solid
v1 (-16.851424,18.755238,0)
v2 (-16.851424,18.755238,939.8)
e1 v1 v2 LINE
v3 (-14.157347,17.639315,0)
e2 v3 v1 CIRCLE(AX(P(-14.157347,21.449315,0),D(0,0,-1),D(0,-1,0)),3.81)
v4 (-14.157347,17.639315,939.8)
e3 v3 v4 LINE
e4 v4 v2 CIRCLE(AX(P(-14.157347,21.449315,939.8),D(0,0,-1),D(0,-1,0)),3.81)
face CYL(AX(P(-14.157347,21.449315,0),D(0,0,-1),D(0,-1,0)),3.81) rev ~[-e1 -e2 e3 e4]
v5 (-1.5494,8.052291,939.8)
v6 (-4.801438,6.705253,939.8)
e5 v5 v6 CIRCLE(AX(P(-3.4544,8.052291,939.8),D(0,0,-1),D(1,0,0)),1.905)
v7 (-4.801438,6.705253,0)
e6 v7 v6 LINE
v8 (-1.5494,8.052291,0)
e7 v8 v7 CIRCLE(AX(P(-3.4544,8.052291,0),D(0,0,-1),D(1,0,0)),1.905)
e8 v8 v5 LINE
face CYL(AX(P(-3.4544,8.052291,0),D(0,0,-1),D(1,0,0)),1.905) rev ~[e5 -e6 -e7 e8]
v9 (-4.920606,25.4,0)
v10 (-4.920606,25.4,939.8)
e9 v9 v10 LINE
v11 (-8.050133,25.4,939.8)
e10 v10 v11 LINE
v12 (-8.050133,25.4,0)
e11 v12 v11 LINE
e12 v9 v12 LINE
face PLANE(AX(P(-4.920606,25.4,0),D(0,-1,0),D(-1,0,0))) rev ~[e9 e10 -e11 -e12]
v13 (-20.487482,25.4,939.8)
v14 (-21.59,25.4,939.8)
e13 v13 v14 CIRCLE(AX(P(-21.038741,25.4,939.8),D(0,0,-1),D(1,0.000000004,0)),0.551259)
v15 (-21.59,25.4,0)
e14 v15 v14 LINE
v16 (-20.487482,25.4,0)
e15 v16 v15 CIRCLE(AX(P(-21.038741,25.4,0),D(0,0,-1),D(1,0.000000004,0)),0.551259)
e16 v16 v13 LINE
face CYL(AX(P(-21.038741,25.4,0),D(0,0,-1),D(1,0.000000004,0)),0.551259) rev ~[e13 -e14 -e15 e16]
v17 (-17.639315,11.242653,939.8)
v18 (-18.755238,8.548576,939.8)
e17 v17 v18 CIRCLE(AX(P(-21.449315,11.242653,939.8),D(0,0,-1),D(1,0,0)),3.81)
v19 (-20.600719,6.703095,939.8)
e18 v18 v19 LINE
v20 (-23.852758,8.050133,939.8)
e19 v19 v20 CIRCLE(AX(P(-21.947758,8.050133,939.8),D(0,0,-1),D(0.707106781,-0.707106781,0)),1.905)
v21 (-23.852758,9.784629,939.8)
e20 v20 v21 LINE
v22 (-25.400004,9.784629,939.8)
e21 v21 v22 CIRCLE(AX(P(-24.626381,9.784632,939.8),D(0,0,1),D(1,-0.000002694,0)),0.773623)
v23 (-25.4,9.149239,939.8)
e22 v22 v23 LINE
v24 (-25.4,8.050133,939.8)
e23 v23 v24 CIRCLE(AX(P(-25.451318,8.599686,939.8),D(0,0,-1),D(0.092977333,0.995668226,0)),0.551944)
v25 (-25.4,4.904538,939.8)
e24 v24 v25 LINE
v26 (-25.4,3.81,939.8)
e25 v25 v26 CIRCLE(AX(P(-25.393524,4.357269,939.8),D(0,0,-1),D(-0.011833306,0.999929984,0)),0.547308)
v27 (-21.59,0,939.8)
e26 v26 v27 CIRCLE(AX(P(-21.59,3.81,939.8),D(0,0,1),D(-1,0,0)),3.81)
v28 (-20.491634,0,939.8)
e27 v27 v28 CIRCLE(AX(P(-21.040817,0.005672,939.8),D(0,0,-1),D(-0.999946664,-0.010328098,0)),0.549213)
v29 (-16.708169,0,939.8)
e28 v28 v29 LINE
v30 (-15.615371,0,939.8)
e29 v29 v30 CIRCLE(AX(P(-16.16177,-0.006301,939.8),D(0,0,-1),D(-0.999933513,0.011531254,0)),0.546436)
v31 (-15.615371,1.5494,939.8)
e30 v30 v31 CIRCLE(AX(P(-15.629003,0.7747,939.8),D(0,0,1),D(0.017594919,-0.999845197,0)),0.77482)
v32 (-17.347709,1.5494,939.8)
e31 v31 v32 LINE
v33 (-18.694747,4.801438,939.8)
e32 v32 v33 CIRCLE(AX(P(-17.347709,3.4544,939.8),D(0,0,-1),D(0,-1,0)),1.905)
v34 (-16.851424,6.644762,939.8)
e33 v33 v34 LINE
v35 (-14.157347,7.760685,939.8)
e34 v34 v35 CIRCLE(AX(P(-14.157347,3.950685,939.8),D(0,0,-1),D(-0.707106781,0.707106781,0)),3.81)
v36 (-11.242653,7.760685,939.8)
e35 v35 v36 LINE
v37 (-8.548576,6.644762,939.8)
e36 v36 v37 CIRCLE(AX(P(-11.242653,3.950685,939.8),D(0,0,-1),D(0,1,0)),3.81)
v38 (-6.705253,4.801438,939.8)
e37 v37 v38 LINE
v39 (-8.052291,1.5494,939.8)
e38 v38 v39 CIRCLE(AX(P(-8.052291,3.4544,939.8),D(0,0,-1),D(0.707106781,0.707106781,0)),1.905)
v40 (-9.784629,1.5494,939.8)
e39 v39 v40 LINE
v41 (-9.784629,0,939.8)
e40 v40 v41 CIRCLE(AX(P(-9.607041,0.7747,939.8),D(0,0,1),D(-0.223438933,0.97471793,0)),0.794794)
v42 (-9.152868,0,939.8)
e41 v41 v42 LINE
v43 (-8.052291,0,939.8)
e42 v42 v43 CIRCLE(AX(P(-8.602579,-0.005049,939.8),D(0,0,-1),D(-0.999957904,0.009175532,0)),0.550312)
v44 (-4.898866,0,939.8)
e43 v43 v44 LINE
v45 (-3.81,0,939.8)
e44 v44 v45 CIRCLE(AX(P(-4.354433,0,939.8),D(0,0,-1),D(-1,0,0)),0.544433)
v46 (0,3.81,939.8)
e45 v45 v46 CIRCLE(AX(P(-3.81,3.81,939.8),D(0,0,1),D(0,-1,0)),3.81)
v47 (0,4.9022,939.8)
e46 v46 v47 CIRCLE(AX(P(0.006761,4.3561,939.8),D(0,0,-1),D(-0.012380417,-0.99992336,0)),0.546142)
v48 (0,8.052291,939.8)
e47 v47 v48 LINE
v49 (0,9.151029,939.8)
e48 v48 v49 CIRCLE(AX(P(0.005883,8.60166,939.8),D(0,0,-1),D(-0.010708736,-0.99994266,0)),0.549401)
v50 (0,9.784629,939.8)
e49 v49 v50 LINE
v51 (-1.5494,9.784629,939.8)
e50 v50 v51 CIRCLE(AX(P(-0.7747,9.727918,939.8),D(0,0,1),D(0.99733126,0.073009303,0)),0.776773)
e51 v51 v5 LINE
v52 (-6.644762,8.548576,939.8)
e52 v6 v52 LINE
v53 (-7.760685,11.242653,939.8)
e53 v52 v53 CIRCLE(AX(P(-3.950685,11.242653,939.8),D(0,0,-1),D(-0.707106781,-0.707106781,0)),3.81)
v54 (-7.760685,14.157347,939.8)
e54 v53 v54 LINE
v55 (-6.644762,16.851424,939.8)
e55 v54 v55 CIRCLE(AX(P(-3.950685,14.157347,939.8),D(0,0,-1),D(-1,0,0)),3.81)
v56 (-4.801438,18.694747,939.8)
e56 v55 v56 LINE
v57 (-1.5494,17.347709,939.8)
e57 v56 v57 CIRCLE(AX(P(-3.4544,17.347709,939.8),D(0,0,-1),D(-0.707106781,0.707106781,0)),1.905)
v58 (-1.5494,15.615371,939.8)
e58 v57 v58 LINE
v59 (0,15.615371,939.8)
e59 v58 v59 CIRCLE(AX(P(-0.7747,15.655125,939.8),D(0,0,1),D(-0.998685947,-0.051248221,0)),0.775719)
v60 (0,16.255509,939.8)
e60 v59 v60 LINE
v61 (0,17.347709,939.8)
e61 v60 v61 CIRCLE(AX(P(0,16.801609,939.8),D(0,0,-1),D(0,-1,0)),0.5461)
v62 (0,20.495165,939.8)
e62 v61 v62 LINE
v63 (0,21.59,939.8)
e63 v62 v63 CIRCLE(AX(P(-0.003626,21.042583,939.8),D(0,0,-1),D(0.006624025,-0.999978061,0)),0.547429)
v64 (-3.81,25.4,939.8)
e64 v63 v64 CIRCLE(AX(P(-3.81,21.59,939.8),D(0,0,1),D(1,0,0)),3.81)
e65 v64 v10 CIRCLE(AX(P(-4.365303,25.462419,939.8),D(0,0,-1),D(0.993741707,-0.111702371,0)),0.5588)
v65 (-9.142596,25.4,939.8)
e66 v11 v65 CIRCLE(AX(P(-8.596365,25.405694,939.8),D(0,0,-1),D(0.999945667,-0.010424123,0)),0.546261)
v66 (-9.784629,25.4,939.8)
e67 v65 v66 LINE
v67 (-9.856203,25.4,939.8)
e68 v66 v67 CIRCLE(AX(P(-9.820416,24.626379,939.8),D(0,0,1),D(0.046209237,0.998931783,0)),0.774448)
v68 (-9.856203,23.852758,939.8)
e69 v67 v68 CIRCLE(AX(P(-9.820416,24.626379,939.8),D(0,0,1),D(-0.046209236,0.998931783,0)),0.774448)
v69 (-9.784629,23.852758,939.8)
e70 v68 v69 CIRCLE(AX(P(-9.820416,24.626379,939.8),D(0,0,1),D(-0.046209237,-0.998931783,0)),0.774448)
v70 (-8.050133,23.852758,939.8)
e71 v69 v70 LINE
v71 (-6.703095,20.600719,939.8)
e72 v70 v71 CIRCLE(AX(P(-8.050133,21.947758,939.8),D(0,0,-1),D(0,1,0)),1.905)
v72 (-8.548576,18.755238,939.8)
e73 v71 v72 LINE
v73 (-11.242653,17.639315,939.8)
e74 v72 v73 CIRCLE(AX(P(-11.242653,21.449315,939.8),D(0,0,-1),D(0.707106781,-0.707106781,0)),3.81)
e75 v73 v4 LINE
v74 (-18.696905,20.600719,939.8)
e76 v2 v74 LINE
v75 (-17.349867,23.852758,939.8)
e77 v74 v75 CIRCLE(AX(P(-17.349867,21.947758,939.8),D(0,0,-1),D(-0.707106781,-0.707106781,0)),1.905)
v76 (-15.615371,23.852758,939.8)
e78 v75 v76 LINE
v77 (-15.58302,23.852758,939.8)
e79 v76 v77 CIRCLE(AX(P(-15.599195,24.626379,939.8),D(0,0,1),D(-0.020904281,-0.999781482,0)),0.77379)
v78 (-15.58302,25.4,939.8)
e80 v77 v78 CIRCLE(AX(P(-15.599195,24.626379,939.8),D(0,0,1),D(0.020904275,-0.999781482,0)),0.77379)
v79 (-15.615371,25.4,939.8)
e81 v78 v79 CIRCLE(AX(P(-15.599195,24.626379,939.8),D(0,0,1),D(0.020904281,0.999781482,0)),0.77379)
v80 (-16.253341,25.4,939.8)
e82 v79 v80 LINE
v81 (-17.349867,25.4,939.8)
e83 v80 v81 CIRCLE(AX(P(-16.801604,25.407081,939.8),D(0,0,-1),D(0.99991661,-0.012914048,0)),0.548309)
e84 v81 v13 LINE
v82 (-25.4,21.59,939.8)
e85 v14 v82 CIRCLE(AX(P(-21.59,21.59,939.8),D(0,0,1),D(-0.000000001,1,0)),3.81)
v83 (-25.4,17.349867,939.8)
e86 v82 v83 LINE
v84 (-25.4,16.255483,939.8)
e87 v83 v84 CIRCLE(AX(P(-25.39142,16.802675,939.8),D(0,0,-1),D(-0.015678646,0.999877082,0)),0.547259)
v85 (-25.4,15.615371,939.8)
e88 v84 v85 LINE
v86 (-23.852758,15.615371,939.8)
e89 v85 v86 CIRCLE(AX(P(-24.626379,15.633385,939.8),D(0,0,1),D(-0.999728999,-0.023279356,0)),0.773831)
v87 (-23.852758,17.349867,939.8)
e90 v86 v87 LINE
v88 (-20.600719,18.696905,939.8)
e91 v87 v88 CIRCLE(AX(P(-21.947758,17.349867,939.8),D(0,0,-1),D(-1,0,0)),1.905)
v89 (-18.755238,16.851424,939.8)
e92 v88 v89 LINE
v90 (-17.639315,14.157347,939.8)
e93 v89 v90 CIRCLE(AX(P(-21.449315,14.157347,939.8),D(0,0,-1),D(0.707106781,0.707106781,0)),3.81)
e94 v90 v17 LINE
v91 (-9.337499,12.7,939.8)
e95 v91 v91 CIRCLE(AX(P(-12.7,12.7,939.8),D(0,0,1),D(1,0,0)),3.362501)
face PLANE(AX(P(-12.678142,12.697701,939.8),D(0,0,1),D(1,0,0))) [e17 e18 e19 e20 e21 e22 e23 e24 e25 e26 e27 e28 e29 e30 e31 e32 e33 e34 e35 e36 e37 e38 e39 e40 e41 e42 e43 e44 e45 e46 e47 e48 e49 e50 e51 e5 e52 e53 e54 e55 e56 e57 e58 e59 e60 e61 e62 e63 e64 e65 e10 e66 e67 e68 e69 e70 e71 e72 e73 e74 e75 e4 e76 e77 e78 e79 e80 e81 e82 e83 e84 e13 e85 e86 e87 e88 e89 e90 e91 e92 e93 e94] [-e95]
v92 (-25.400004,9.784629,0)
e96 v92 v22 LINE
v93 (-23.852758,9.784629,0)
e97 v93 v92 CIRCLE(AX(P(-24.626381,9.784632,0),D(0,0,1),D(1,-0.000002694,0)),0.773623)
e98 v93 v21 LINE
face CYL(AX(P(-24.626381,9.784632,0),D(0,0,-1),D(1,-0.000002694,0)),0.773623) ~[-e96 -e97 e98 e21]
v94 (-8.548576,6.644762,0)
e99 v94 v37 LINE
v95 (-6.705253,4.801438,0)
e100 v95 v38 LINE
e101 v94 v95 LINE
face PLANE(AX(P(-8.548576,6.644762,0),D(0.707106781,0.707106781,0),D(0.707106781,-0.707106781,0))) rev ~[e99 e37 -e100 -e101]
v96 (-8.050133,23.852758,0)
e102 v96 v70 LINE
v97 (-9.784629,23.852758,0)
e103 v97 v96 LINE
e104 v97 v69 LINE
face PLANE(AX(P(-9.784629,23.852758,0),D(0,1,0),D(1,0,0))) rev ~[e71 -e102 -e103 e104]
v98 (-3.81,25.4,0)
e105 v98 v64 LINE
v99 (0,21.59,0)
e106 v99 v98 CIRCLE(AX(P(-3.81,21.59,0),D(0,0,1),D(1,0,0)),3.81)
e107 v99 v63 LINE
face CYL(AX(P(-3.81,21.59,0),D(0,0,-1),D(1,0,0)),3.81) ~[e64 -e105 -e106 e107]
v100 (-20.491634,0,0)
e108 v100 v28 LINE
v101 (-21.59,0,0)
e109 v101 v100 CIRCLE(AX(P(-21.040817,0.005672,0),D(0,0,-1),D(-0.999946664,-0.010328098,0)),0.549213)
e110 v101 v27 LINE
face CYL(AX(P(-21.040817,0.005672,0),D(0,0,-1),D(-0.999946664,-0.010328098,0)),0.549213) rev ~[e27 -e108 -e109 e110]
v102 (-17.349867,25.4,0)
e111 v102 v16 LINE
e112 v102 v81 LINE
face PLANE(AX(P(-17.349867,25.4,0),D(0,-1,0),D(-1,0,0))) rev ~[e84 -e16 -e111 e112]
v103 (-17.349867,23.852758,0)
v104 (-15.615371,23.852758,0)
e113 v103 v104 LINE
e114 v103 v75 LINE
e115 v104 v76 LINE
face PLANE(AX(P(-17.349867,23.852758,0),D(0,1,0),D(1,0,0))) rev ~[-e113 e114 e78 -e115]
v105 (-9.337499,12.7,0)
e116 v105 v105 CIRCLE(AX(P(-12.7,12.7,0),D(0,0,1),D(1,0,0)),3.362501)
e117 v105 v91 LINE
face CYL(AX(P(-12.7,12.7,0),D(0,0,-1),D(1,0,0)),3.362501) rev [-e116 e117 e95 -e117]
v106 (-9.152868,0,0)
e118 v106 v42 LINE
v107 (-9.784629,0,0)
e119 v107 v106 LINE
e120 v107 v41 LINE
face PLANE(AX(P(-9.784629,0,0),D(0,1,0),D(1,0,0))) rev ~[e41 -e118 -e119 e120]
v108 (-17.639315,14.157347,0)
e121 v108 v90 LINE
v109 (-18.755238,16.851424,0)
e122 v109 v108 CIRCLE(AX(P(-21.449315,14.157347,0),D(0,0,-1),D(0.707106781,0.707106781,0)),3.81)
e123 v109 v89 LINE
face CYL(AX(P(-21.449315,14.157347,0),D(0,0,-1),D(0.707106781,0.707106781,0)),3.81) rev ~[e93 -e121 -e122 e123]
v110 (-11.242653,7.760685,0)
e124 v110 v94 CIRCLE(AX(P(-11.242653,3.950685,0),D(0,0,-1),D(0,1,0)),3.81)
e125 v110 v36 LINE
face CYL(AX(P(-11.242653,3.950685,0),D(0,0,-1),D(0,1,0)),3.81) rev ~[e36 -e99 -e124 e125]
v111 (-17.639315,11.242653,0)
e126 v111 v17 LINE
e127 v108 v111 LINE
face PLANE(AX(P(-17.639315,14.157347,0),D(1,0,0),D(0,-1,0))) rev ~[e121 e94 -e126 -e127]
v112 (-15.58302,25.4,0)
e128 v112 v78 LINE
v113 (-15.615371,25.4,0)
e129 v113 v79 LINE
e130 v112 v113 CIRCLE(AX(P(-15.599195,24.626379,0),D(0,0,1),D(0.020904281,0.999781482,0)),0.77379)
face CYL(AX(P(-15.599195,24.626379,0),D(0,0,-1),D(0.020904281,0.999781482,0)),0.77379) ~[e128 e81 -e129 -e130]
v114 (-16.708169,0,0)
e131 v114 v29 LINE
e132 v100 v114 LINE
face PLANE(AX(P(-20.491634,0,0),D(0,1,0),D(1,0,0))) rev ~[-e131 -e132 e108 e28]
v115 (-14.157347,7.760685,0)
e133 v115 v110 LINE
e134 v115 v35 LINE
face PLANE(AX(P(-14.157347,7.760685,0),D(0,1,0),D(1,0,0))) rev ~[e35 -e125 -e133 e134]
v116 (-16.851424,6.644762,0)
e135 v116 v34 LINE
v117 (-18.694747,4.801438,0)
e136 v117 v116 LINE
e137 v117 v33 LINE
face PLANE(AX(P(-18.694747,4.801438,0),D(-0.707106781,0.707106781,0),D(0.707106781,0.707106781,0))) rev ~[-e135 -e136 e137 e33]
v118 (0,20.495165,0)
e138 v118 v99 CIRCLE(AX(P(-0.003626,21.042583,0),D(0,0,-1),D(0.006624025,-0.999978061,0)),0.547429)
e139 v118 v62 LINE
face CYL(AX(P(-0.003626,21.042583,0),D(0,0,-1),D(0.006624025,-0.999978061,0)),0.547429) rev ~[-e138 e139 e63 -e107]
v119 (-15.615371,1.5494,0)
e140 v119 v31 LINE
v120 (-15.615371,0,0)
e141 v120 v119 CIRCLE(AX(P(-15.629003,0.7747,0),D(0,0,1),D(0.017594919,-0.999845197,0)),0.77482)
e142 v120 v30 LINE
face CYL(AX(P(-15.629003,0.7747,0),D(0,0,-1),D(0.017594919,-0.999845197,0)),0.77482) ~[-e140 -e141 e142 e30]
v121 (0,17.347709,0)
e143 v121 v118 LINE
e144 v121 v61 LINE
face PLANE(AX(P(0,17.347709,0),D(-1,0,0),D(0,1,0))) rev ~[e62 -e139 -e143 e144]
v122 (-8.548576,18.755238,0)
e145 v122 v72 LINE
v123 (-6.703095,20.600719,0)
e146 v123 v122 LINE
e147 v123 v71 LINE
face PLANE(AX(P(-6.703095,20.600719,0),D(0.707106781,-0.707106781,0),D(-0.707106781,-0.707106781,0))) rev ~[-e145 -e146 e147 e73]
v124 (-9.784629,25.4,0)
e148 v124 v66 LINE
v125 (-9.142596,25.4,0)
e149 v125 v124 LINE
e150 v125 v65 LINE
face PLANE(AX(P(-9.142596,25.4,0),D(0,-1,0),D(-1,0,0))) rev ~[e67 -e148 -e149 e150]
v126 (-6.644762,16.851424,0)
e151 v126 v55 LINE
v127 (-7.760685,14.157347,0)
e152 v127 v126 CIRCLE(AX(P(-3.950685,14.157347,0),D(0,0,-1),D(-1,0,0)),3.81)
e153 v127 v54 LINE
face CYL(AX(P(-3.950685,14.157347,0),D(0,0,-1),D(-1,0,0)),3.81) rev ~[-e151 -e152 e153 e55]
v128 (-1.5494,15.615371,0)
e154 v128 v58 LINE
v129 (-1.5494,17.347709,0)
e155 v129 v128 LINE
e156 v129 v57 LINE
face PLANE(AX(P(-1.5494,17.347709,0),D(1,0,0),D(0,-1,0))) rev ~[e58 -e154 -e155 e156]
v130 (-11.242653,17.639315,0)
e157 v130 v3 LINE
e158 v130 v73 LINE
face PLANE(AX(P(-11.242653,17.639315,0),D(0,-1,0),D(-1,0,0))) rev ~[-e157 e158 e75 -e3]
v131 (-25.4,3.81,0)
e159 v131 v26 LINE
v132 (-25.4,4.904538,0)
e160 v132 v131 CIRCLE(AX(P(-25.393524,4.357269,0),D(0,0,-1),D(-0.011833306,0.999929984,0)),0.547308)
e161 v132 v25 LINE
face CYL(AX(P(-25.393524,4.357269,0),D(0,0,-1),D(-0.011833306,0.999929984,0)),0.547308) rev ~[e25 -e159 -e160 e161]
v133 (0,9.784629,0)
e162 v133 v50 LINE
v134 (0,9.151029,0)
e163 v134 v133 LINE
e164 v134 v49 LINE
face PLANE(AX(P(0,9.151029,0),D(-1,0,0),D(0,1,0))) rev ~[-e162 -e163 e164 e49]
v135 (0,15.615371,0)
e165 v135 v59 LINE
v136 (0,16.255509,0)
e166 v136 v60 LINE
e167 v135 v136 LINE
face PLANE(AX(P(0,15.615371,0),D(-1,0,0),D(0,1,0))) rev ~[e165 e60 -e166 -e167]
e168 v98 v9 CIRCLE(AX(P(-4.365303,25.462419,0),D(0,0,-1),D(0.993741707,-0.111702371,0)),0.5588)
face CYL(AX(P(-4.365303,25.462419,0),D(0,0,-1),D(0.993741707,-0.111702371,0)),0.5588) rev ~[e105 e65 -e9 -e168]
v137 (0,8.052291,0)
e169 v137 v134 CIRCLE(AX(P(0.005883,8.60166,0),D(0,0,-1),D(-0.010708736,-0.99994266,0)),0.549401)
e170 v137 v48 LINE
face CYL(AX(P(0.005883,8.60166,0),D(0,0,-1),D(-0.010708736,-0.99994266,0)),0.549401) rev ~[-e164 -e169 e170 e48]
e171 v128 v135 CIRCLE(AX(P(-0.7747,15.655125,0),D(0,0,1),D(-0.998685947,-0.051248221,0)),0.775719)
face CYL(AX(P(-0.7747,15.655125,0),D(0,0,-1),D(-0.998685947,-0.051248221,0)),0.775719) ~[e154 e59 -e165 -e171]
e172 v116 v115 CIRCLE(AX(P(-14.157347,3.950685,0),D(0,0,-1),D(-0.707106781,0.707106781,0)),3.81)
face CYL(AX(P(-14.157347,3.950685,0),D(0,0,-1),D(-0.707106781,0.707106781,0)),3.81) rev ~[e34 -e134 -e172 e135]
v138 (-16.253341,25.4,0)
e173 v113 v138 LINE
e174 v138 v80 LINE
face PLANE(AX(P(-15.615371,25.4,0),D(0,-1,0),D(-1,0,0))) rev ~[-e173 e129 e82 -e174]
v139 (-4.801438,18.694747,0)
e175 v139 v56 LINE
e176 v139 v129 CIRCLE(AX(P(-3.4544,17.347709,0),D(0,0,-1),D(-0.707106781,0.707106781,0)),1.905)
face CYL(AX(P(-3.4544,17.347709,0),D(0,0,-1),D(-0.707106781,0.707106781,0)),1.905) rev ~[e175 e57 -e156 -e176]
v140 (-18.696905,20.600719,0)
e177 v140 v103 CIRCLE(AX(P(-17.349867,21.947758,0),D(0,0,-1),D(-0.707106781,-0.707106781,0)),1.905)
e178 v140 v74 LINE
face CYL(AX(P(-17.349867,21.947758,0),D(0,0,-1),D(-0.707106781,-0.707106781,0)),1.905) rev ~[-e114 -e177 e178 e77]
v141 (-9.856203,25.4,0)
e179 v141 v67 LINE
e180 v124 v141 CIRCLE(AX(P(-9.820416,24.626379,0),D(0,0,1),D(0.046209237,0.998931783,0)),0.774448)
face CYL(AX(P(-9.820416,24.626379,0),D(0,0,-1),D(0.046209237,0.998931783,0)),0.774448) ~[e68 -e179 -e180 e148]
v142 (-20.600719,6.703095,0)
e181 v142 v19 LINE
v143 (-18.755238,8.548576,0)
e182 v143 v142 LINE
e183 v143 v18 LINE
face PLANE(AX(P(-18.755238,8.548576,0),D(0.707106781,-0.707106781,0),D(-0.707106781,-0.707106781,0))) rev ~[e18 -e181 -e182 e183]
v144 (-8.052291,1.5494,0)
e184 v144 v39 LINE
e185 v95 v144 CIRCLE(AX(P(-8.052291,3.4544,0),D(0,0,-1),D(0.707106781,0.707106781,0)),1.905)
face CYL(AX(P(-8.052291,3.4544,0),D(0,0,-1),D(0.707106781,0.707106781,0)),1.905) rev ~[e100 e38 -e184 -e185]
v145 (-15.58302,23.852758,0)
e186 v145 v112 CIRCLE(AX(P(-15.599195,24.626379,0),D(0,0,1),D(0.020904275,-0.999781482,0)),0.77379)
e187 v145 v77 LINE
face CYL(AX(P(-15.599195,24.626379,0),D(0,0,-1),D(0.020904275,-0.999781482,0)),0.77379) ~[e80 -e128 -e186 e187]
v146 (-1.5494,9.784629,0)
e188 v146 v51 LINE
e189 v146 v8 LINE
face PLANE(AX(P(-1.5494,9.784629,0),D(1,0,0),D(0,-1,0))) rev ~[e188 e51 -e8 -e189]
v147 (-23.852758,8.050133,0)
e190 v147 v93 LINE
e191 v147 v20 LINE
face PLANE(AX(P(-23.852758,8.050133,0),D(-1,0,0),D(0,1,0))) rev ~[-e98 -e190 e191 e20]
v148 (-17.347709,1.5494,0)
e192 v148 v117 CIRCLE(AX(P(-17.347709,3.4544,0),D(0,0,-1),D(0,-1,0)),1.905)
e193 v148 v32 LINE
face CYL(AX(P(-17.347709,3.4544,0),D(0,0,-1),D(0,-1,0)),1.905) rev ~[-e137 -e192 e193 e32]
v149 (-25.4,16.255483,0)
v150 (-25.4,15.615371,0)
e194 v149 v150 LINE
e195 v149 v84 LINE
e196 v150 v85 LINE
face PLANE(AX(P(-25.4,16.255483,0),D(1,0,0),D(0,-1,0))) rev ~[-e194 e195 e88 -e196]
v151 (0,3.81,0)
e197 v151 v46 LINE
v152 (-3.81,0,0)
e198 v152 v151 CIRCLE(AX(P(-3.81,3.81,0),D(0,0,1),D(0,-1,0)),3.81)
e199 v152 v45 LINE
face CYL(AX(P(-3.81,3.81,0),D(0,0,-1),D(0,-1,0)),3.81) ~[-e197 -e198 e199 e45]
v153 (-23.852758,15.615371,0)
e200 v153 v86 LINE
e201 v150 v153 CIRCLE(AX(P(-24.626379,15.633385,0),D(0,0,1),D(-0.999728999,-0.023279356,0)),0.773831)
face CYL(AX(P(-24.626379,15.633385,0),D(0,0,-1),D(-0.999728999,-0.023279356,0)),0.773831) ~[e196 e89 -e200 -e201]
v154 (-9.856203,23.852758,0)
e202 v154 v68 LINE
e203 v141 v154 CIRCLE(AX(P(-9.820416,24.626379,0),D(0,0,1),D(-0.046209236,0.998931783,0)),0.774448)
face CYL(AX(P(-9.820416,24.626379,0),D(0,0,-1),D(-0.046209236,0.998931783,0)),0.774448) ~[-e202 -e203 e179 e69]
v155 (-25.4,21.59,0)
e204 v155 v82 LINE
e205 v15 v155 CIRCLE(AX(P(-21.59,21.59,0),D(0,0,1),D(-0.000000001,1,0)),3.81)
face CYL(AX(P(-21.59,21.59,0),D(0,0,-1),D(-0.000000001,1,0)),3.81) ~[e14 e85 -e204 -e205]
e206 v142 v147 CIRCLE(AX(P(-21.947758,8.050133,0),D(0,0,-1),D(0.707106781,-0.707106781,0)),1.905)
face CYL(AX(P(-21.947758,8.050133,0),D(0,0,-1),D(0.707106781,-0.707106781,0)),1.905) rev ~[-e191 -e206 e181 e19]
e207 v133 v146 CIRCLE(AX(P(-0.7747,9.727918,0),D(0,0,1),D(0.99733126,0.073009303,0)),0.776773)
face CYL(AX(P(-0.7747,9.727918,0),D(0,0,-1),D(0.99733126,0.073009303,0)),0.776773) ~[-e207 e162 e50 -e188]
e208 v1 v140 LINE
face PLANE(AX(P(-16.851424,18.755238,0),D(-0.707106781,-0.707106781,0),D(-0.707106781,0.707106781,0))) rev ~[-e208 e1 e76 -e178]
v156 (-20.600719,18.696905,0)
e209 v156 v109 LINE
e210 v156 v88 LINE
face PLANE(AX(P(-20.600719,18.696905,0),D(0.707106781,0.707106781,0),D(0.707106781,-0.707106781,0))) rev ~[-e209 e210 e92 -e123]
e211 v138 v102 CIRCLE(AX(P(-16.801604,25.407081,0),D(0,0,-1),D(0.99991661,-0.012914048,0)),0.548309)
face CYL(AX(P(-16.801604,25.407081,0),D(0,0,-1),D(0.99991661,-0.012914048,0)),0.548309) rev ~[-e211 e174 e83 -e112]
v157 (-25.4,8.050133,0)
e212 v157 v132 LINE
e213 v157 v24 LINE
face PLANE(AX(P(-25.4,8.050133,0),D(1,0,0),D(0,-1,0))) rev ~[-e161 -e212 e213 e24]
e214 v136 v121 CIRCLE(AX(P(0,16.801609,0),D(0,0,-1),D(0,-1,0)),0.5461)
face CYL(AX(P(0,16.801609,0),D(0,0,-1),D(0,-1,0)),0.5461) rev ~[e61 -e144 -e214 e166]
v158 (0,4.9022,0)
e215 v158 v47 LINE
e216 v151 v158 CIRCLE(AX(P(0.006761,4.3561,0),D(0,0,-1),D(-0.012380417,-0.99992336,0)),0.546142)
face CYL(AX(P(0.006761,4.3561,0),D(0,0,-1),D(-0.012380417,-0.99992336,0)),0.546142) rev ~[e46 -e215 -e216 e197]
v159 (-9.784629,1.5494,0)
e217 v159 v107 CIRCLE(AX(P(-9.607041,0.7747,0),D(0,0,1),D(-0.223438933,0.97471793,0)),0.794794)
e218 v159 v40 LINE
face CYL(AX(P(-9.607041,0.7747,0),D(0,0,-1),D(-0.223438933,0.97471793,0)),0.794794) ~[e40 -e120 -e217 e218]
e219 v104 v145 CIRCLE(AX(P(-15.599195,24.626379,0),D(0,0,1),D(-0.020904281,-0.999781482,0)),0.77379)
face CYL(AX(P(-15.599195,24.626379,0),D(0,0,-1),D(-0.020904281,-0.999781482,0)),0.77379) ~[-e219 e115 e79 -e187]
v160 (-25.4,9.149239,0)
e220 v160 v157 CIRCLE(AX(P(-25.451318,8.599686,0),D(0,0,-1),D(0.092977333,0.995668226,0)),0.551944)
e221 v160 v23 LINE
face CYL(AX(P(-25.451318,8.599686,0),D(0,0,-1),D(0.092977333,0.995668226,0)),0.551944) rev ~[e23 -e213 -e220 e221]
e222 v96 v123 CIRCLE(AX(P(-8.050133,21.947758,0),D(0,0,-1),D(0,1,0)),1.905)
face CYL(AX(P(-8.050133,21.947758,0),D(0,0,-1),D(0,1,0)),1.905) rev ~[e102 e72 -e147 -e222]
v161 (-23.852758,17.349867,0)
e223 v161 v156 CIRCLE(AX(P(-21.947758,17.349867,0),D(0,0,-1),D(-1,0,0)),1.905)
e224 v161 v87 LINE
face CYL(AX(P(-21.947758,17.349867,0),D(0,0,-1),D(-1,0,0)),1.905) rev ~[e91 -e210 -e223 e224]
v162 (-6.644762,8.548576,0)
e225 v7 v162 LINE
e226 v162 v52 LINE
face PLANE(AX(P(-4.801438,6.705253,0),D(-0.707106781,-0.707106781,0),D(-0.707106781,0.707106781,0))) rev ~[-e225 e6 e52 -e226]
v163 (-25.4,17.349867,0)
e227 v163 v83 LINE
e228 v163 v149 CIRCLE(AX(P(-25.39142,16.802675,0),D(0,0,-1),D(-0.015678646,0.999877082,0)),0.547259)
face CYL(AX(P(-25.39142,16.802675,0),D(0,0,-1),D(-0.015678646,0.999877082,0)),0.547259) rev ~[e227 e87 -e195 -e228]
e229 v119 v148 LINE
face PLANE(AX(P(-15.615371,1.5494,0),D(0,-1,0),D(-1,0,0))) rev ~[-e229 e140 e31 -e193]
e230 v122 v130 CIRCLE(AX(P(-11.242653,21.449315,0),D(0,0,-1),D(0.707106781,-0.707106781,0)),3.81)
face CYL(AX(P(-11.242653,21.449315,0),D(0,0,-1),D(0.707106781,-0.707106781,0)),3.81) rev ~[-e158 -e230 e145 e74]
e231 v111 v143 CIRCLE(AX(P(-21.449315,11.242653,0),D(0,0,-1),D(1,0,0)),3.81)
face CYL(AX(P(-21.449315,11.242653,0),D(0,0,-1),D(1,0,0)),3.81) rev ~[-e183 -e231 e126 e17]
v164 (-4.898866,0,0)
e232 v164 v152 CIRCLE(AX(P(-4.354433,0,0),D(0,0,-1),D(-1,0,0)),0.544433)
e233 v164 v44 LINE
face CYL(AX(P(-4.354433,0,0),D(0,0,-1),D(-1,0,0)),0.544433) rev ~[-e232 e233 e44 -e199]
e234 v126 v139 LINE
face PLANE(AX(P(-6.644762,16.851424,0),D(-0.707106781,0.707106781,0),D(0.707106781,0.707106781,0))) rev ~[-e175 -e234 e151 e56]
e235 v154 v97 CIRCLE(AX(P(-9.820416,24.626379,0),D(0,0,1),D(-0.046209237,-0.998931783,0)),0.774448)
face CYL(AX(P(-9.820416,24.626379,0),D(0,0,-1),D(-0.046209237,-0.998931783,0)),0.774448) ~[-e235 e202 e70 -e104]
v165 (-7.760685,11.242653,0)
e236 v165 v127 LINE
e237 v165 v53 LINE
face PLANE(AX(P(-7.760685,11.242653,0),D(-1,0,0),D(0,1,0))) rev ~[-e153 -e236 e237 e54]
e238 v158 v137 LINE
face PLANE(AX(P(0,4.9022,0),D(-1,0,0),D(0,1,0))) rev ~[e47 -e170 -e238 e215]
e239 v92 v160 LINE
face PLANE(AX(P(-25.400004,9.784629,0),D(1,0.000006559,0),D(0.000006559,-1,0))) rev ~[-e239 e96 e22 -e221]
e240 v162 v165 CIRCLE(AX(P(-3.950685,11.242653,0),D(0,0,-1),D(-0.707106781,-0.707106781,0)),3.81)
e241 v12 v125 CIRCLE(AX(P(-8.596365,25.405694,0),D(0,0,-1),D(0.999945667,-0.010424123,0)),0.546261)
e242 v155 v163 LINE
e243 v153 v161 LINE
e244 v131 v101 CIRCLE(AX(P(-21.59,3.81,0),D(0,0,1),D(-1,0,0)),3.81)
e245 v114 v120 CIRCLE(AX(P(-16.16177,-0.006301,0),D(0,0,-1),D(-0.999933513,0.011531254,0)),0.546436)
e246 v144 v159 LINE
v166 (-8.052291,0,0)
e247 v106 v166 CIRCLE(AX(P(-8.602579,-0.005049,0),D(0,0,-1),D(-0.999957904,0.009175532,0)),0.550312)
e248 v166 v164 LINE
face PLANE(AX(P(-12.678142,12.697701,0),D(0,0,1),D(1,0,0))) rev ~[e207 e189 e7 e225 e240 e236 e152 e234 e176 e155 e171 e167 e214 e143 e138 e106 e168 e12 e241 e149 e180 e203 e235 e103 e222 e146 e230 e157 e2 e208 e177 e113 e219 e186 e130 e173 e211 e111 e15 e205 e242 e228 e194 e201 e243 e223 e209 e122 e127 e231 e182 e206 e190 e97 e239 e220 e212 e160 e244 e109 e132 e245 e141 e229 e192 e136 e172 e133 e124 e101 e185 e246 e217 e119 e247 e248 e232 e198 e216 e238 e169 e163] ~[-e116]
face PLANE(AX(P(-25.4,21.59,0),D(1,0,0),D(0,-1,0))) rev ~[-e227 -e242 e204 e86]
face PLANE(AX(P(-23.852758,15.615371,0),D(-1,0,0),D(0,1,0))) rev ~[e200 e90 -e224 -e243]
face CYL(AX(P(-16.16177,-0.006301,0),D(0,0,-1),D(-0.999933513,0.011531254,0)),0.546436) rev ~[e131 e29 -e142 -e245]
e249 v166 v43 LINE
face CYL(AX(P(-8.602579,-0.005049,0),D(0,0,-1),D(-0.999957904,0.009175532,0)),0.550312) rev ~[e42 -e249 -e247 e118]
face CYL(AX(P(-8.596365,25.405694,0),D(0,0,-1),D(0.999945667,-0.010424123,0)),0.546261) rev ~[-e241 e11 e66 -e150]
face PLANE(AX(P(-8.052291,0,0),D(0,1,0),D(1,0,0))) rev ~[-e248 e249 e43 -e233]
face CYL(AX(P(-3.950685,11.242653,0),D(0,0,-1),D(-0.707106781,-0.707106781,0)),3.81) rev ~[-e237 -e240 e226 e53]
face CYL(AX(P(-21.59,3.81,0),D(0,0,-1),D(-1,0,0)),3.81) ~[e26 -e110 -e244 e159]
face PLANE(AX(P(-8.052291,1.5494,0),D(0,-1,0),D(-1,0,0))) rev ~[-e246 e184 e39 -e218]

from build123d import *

# Parameters (mm, degrees)
F0_R     = 3.3625011168
F1_DEPTH = 939.8


# Not quite as in the source:
# - ends of sketch curves that miss each other by under 0.0002 mm in the source are joined


with BuildPart() as f1:
    # F0 (on Top) → F1 (new body)
    with BuildSketch(Plane.XY):
        with BuildLine():
            ThreePointArc((-8.5485764575, 18.7552378401), (-9.7846294165, 17.9293336576), (-11.2426532939, 17.6393146764))
            Line((-11.2426532939, 17.6393146764), (-14.1573467061, 17.6393146764))
            ThreePointArc((-14.1573467061, 17.6393146764), (-15.6153705835, 17.9293336576), (-16.8514235425, 18.7552378401))
            Line((-16.8514235425, 18.7552378401), (-18.696905198, 20.6007194956))
            ThreePointArc((-18.696905198, 20.6007194956), (-19.1098572893, 22.6767698525), (-17.3498667798, 23.8527579138))
            Line((-17.3498667798, 23.8527579138), (-15.6153705835, 23.8527579138))
            Line((-15.6153705835, 23.8527579138), (-15.5830195394, 23.8527579138))
            ThreePointArc((-15.5830195394, 23.8527579138), (-14.8254049311, 24.6263789569), (-15.5830195394, 25.4))
            Line((-15.5830195394, 25.4), (-15.6153705835, 25.4))
            Line((-15.6153705835, 25.4), (-16.2533409894, 25.4))
            ThreePointArc((-16.2533409894, 25.4), (-16.8016038846, 24.8587722652), (-17.3498667798, 25.4))
            Line((-17.3498667798, 25.4), (-20.4874817282, 25.4))
            ThreePointArc((-20.4874817282, 25.4), (-21.0387408641, 24.8487408595), (-21.5900000046, 25.4))
            ThreePointArc((-21.5900000046, 25.4), (-24.2840768363, 24.2840768363), (-25.4, 21.59))
            Line((-25.4, 21.59), (-25.4, 20.5047242343))
            Line((-25.4, 20.5047242343), (-25.4, 17.3498667798))
            ThreePointArc((-25.4, 17.3498667798), (-24.8441605755, 16.8026749055), (-25.4, 16.2554830313))
            Line((-25.4, 16.2554830313), (-25.4, 15.6153705835))
            ThreePointArc((-25.4, 15.6153705835), (-24.6263789569, 14.8595541131), (-23.8527579138, 15.6153705835))
            Line((-23.8527579138, 15.6153705835), (-23.8527579138, 17.3498667798))
            ThreePointArc((-23.8527579138, 17.3498667798), (-22.6767698525, 19.1098572893), (-20.6007194956, 18.696905198))
            Line((-20.6007194956, 18.696905198), (-18.7552378401, 16.8514235425))
            ThreePointArc((-18.7552378401, 16.8514235425), (-17.9293336576, 15.6153705835), (-17.6393146764, 14.1573467061))
            Line((-17.6393146764, 14.1573467061), (-17.6393146764, 11.2426532939))
            ThreePointArc((-17.6393146764, 11.2426532939), (-17.9293336576, 9.7846294165), (-18.7552378401, 8.5485764575))
            Line((-18.7552378401, 8.5485764575), (-20.6007194956, 6.703094802))
            ThreePointArc((-20.6007194956, 6.703094802), (-22.6767698525, 6.2901427107), (-23.8527579138, 8.0501332202))
            Line((-23.8527579138, 8.0501332202), (-23.8527579138, 9.7846294165))
            ThreePointArc((-23.8527579138, 9.7846294165), (-24.6263789569, 10.5582546272), (-25.4000041675, 9.7846294165))
            Line((-25.4000041675, 9.7846294165), (-25.4, 9.1492393985))
            ThreePointArc((-25.4, 9.1492393985), (-24.8993742936, 8.5996863094), (-25.4, 8.0501332202))
            Line((-25.4, 8.0501332202), (-25.4, 4.904538393))
            ThreePointArc((-25.4, 4.904538393), (-24.8462160257, 4.3572691965), (-25.4, 3.81))
            ThreePointArc((-25.4, 3.81), (-24.2840768363, 1.1159231637), (-21.59, 0))
            ThreePointArc((-21.59, 0), (-21.0408167821, 0.5548848314), (-20.4916335642, 0))
            Line((-20.4916335642, 0), (-16.7081691325, 0))
            ThreePointArc((-16.7081691325, 0), (-16.161769858, 0.5401345174), (-15.6153705835, 0))
            ThreePointArc((-15.6153705835, 0), (-14.8541835334, 0.7747), (-15.6153705835, 1.5494))
            Line((-15.6153705835, 1.5494), (-17.347708866, 1.5494))
            ThreePointArc((-17.347708866, 1.5494), (-19.1076993754, 2.7253880613), (-18.6947472842, 4.8014384182))
            Line((-18.6947472842, 4.8014384182), (-16.8514235425, 6.6447621599))
            ThreePointArc((-16.8514235425, 6.6447621599), (-15.6153705835, 7.4706663424), (-14.1573467061, 7.7606853236))
            Line((-14.1573467061, 7.7606853236), (-11.2426532939, 7.7606853236))
            ThreePointArc((-11.2426532939, 7.7606853236), (-9.7846294165, 7.4706663424), (-8.5485764575, 6.6447621599))
            Line((-8.5485764575, 6.6447621599), (-6.7052527158, 4.8014384182))
            ThreePointArc((-6.7052527158, 4.8014384182), (-6.2923006246, 2.7253880613), (-8.052291134, 1.5494))
            Line((-8.052291134, 1.5494), (-9.7846294165, 1.5494))
            ThreePointArc((-9.7846294165, 1.5494), (-10.4018355229, 0.7747), (-9.7846294165, 0))
            Line((-9.7846294165, 0), (-9.1528678313, 0))
            ThreePointArc((-9.1528678313, 0), (-8.6025794826, 0.5452621138), (-8.052291134, 0))
            Line((-8.052291134, 0), (-4.8988661729, 0))
            ThreePointArc((-4.8988661729, 0), (-4.3544330864, 0.5444330864), (-3.81, 0))
            ThreePointArc((-3.81, 0), (-1.1159231637, 1.1159231637), (0, 3.81))
            ThreePointArc((0, 3.81), (-0.5393803924, 4.3561), (0, 4.9022))
            Line((0, 4.9022), (0, 8.052291134))
            ThreePointArc((0, 8.052291134), (-0.5435172497, 8.6016602673), (0, 9.1510294005))
            Line((0, 9.1510294005), (0, 9.7846294165))
            ThreePointArc((0, 9.7846294165), (-0.7747, 10.5046907664), (-1.5494, 9.7846294165))
            Line((-1.5494, 9.7846294165), (-1.5494, 8.052291134))
            ThreePointArc((-1.5494, 8.052291134), (-2.7253880613, 6.2923006246), (-4.8014384182, 6.7052527158))
            Line((-4.8014384182, 6.7052527158), (-6.6447621599, 8.5485764575))
            ThreePointArc((-6.6447621599, 8.5485764575), (-7.4706663424, 9.7846294165), (-7.7606853236, 11.2426532939))
            Line((-7.7606853236, 11.2426532939), (-7.7606853236, 14.1573467061))
            ThreePointArc((-7.7606853236, 14.1573467061), (-7.4706663424, 15.6153705835), (-6.6447621599, 16.8514235425))
            Line((-6.6447621599, 16.8514235425), (-4.8014384182, 18.6947472842))
            ThreePointArc((-4.8014384182, 18.6947472842), (-2.7253880613, 19.1076993754), (-1.5494, 17.347708866))
            Line((-1.5494, 17.347708866), (-1.5494, 15.6153705835))
            ThreePointArc((-1.5494, 15.6153705835), (-0.7747, 14.8794054827), (0, 15.6153705835))
            Line((0, 15.6153705835), (0, 16.255508866))
            ThreePointArc((0, 16.255508866), (-0.5461, 16.801608866), (0, 17.347708866))
            Line((0, 17.347708866), (0, 20.4951651394))
            ThreePointArc((0, 20.4951651394), (-0.5510556267, 21.0425825697), (0, 21.59))
            ThreePointArc((0, 21.59), (-1.1159231637, 24.2840768363), (-3.81, 25.4))
            ThreePointArc((-3.81, 25.4), (-4.3653028659, 24.9036192847), (-4.9206057318, 25.4))
            Line((-4.9206057318, 25.4), (-8.0501332202, 25.4))
            ThreePointArc((-8.0501332202, 25.4), (-8.5963647474, 24.8594330871), (-9.1425962746, 25.4))
            Line((-9.1425962746, 25.4), (-9.7846294165, 25.4))
            Line((-9.7846294165, 25.4), (-9.856202747, 25.4))
            ThreePointArc((-9.856202747, 25.4), (-10.594864404, 24.6263789569), (-9.856202747, 23.8527579138))
            Line((-9.856202747, 23.8527579138), (-9.7846294165, 23.8527579138))
            Line((-9.7846294165, 23.8527579138), (-8.0501332202, 23.8527579138))
            ThreePointArc((-8.0501332202, 23.8527579138), (-6.2901427107, 22.6767698525), (-6.703094802, 20.6007194956))
            Line((-6.703094802, 20.6007194956), (-8.5485764575, 18.7552378401))
        make_face()
        with Locations((-12.7, 12.7)):
            Circle(F0_R, mode=Mode.SUBTRACT)
        with BuildLine():
            ThreePointArc((-9.856202747, 23.8527579138), (-9.8204160818, 23.8519306347), (-9.7846294165, 23.8527579138))
            Line((-9.7846294165, 23.8527579138), (-9.856202747, 23.8527579138))
        make_face()
        with BuildLine():
            Line((-15.5830195394, 23.8527579138), (-15.6153705835, 23.8527579138))
            ThreePointArc((-15.6153705835, 23.8527579138), (-15.5991950614, 23.8525888265), (-15.5830195394, 23.8527579138))
        make_face()
        with BuildLine():
            ThreePointArc((-9.7846294165, 25.4), (-9.8204160818, 25.4008272791), (-9.856202747, 25.4))
            Line((-9.856202747, 25.4), (-9.7846294165, 25.4))
        make_face()
        with BuildLine():
            Line((-15.6153705835, 25.4), (-15.5830195394, 25.4))
            ThreePointArc((-15.5830195394, 25.4), (-15.5991950614, 25.4001690873), (-15.6153705835, 25.4))
        make_face()
    extrude(amount=F1_DEPTH)


solid = f1.part
